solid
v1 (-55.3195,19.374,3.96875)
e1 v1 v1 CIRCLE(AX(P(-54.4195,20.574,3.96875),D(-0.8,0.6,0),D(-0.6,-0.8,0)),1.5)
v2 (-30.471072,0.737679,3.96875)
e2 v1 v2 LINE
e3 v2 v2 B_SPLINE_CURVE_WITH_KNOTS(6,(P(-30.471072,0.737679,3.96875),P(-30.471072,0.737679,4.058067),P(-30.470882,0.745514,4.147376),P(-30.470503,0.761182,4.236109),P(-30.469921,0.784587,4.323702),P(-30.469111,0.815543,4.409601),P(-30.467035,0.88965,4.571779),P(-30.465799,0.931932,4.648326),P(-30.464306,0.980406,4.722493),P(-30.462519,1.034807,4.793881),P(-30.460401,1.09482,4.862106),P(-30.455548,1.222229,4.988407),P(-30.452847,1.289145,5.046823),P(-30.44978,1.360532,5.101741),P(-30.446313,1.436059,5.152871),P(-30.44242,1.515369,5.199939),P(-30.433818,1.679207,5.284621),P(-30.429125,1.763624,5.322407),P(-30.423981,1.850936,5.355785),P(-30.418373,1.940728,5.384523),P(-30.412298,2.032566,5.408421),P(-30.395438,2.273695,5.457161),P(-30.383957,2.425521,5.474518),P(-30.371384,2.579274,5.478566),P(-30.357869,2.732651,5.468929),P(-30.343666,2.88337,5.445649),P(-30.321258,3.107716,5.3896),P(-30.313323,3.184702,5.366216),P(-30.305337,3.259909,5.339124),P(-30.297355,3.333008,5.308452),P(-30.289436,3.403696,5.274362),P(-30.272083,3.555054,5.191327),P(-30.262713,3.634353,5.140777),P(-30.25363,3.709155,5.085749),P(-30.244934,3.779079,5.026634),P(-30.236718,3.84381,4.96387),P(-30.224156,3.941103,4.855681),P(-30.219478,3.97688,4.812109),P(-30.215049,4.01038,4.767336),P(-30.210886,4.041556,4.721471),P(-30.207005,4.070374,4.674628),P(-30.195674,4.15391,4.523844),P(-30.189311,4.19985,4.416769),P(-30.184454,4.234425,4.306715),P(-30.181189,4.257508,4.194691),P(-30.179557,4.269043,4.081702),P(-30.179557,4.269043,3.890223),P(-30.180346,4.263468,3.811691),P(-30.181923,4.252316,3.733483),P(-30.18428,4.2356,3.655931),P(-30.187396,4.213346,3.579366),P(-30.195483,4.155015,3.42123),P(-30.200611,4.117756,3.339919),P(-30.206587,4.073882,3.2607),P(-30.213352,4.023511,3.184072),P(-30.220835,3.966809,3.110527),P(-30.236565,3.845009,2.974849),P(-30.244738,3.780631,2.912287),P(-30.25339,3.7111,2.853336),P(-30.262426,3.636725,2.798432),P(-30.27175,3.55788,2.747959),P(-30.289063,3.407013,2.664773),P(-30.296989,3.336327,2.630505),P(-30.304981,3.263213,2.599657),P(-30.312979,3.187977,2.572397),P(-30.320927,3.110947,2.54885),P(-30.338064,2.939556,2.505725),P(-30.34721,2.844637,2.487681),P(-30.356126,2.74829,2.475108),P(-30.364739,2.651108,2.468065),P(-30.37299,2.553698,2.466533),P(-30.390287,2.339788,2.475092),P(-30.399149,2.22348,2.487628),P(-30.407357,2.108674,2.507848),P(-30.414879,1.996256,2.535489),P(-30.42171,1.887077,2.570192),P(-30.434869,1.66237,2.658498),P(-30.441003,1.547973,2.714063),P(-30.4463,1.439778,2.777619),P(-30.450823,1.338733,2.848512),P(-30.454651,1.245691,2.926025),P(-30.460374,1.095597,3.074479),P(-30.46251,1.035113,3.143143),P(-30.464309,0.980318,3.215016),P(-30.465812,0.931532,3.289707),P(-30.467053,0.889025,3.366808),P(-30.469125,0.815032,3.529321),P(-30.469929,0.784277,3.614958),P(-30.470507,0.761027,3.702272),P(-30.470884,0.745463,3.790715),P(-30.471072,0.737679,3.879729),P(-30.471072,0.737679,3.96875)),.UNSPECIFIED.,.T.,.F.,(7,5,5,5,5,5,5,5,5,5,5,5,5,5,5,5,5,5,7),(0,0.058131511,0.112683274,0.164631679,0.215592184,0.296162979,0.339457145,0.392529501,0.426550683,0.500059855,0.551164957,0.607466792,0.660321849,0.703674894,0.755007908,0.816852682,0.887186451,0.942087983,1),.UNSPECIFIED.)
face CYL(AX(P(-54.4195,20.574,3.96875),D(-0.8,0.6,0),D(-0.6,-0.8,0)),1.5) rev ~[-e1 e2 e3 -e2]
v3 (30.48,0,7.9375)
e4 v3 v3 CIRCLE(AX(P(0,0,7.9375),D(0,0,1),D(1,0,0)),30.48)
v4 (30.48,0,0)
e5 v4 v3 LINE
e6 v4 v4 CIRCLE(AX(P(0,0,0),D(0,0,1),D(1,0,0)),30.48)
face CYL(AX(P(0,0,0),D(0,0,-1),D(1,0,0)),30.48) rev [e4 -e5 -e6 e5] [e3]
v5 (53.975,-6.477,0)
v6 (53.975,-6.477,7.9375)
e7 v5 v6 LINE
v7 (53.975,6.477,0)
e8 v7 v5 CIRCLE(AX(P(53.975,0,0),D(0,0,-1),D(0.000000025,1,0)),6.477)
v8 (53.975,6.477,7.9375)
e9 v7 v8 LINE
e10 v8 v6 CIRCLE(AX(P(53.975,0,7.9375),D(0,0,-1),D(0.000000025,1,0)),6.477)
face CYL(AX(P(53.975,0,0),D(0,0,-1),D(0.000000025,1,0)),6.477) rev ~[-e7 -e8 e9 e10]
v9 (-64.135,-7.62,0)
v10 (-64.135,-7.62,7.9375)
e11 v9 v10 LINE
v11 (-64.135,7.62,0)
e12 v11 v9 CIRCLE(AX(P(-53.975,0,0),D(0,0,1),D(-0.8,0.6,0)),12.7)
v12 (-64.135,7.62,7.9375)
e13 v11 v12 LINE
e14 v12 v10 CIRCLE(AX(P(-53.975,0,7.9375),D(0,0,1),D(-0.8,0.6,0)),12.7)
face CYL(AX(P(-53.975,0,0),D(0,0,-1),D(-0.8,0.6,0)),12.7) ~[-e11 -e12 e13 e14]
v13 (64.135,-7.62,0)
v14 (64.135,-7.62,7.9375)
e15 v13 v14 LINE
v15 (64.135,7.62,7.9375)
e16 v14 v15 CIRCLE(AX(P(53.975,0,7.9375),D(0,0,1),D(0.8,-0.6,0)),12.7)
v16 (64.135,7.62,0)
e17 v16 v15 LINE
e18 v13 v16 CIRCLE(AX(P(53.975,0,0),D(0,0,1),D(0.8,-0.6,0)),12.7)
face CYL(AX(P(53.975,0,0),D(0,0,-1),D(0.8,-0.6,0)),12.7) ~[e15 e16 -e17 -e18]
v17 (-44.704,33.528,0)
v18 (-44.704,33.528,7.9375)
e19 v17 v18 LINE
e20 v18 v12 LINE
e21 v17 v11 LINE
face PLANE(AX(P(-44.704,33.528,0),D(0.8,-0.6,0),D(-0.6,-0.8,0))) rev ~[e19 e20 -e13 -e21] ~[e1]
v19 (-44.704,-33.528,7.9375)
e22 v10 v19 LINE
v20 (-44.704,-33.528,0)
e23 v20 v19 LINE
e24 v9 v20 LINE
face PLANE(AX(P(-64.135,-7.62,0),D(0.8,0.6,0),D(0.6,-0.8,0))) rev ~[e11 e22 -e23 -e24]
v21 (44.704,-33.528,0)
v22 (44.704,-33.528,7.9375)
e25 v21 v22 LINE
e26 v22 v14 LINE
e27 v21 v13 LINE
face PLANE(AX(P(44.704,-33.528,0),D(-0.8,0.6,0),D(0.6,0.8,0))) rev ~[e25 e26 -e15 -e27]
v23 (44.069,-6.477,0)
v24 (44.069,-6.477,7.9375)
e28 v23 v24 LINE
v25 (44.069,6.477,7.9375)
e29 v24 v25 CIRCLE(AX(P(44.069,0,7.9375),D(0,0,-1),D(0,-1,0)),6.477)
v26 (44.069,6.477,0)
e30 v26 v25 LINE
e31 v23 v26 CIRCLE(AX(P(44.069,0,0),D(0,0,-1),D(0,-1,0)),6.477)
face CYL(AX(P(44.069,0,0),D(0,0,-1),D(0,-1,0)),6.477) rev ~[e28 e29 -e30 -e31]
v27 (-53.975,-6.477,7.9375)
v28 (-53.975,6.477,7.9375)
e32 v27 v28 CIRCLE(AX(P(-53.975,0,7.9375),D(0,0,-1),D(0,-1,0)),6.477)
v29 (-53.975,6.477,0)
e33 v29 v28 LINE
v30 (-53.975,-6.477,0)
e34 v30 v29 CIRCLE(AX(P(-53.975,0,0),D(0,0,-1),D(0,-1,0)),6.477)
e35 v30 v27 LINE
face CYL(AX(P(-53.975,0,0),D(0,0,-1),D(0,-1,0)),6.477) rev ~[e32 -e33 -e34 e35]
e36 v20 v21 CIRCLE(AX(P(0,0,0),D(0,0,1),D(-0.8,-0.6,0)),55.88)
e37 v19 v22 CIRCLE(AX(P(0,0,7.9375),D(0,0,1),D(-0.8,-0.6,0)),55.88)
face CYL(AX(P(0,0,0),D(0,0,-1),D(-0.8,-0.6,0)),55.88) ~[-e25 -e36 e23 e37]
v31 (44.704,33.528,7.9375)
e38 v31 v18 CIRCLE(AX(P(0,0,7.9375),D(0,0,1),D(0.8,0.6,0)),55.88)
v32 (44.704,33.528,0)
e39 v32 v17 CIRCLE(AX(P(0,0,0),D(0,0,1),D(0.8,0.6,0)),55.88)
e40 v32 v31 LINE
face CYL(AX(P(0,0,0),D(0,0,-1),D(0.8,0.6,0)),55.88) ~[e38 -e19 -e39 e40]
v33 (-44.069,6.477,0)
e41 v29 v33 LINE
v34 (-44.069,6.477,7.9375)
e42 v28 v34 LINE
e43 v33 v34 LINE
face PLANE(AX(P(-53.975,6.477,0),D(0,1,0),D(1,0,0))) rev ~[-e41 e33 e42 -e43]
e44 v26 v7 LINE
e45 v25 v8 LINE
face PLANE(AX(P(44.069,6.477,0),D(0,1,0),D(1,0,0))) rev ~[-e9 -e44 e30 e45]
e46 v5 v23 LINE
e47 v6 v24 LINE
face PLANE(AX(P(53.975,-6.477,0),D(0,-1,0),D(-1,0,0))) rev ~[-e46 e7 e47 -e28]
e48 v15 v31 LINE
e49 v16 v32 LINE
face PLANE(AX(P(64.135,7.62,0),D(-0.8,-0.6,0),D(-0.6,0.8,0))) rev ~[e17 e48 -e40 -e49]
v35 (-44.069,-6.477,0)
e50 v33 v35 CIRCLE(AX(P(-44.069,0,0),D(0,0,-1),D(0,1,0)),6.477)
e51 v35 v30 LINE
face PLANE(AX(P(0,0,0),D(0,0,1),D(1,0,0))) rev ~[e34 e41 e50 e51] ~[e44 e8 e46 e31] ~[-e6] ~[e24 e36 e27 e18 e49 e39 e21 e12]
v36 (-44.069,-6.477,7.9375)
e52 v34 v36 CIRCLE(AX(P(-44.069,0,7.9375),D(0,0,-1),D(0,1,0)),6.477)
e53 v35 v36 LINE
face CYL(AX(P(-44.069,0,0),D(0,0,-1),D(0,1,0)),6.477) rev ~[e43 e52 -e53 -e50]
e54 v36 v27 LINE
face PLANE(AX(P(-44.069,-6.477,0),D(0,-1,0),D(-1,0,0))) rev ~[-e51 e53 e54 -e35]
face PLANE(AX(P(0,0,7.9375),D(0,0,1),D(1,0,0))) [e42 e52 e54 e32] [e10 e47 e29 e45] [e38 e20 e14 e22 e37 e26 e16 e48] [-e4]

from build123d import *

# Parameters (mm, degrees)
F0_R     = 30.48
F1_DEPTH = 7.9375
F2_R     = 1.5
F3_DEPTH = 32.0605350826


# Not quite as in the source:
# - a length typed as a fraction of an inch, garbled in the dataset ("3 / 203.2 mm" for 3/8 in), is restored


with BuildPart() as f1:
    # F0 (on Top) → F1 (new body)
    with BuildSketch(Plane.XY):
        with BuildLine():
            Line((-64.135, -7.62), (-44.704, -33.528))
            ThreePointArc((-44.704, -33.528), (0, -55.88), (44.704, -33.528))
            Line((44.704, -33.528), (64.135, -7.62))
            ThreePointArc((64.135, -7.62), (66.675, 0), (64.135, 7.62))
            Line((64.135, 7.62), (44.704, 33.528))
            ThreePointArc((44.704, 33.528), (0, 55.88), (-44.704, 33.528))
            Line((-44.704, 33.528), (-64.135, 7.62))
            ThreePointArc((-64.135, 7.62), (-66.675, 0), (-64.135, -7.62))
        make_face()
        with BuildLine():
            ThreePointArc((-53.975, -6.477), (-60.452, 0), (-53.975, 6.477))
            Line((-53.975, 6.477), (-44.069, 6.477))
            ThreePointArc((-44.069, 6.477), (-37.592, 0), (-44.069, -6.477))
            Line((-44.069, -6.477), (-53.975, -6.477))
        make_face(mode=Mode.SUBTRACT)
        Circle(F0_R, mode=Mode.SUBTRACT)
        with BuildLine():
            ThreePointArc((44.069, -6.477), (37.592, 0), (44.069, 6.477))
            Line((44.069, 6.477), (53.9750001618, 6.477))
            ThreePointArc((53.9750001618, 6.477), (60.452, -8.09e-08), (53.975, -6.477))
            Line((53.975, -6.477), (44.069, -6.477))
        make_face(mode=Mode.SUBTRACT)
    extrude(amount=F1_DEPTH)

    # F2 (on face) → F3 (cut, up to face)
    with BuildSketch(Plane(origin=(-44.704, 33.528, 0), x_dir=(-0.6, -0.8, 0), z_dir=(-0.8, 0.6, 0))):
        with Locations((16.1925, 3.96875)):
            Circle(F2_R)
    extrude(amount=-F3_DEPTH, mode=Mode.SUBTRACT)


solid = f1.part
